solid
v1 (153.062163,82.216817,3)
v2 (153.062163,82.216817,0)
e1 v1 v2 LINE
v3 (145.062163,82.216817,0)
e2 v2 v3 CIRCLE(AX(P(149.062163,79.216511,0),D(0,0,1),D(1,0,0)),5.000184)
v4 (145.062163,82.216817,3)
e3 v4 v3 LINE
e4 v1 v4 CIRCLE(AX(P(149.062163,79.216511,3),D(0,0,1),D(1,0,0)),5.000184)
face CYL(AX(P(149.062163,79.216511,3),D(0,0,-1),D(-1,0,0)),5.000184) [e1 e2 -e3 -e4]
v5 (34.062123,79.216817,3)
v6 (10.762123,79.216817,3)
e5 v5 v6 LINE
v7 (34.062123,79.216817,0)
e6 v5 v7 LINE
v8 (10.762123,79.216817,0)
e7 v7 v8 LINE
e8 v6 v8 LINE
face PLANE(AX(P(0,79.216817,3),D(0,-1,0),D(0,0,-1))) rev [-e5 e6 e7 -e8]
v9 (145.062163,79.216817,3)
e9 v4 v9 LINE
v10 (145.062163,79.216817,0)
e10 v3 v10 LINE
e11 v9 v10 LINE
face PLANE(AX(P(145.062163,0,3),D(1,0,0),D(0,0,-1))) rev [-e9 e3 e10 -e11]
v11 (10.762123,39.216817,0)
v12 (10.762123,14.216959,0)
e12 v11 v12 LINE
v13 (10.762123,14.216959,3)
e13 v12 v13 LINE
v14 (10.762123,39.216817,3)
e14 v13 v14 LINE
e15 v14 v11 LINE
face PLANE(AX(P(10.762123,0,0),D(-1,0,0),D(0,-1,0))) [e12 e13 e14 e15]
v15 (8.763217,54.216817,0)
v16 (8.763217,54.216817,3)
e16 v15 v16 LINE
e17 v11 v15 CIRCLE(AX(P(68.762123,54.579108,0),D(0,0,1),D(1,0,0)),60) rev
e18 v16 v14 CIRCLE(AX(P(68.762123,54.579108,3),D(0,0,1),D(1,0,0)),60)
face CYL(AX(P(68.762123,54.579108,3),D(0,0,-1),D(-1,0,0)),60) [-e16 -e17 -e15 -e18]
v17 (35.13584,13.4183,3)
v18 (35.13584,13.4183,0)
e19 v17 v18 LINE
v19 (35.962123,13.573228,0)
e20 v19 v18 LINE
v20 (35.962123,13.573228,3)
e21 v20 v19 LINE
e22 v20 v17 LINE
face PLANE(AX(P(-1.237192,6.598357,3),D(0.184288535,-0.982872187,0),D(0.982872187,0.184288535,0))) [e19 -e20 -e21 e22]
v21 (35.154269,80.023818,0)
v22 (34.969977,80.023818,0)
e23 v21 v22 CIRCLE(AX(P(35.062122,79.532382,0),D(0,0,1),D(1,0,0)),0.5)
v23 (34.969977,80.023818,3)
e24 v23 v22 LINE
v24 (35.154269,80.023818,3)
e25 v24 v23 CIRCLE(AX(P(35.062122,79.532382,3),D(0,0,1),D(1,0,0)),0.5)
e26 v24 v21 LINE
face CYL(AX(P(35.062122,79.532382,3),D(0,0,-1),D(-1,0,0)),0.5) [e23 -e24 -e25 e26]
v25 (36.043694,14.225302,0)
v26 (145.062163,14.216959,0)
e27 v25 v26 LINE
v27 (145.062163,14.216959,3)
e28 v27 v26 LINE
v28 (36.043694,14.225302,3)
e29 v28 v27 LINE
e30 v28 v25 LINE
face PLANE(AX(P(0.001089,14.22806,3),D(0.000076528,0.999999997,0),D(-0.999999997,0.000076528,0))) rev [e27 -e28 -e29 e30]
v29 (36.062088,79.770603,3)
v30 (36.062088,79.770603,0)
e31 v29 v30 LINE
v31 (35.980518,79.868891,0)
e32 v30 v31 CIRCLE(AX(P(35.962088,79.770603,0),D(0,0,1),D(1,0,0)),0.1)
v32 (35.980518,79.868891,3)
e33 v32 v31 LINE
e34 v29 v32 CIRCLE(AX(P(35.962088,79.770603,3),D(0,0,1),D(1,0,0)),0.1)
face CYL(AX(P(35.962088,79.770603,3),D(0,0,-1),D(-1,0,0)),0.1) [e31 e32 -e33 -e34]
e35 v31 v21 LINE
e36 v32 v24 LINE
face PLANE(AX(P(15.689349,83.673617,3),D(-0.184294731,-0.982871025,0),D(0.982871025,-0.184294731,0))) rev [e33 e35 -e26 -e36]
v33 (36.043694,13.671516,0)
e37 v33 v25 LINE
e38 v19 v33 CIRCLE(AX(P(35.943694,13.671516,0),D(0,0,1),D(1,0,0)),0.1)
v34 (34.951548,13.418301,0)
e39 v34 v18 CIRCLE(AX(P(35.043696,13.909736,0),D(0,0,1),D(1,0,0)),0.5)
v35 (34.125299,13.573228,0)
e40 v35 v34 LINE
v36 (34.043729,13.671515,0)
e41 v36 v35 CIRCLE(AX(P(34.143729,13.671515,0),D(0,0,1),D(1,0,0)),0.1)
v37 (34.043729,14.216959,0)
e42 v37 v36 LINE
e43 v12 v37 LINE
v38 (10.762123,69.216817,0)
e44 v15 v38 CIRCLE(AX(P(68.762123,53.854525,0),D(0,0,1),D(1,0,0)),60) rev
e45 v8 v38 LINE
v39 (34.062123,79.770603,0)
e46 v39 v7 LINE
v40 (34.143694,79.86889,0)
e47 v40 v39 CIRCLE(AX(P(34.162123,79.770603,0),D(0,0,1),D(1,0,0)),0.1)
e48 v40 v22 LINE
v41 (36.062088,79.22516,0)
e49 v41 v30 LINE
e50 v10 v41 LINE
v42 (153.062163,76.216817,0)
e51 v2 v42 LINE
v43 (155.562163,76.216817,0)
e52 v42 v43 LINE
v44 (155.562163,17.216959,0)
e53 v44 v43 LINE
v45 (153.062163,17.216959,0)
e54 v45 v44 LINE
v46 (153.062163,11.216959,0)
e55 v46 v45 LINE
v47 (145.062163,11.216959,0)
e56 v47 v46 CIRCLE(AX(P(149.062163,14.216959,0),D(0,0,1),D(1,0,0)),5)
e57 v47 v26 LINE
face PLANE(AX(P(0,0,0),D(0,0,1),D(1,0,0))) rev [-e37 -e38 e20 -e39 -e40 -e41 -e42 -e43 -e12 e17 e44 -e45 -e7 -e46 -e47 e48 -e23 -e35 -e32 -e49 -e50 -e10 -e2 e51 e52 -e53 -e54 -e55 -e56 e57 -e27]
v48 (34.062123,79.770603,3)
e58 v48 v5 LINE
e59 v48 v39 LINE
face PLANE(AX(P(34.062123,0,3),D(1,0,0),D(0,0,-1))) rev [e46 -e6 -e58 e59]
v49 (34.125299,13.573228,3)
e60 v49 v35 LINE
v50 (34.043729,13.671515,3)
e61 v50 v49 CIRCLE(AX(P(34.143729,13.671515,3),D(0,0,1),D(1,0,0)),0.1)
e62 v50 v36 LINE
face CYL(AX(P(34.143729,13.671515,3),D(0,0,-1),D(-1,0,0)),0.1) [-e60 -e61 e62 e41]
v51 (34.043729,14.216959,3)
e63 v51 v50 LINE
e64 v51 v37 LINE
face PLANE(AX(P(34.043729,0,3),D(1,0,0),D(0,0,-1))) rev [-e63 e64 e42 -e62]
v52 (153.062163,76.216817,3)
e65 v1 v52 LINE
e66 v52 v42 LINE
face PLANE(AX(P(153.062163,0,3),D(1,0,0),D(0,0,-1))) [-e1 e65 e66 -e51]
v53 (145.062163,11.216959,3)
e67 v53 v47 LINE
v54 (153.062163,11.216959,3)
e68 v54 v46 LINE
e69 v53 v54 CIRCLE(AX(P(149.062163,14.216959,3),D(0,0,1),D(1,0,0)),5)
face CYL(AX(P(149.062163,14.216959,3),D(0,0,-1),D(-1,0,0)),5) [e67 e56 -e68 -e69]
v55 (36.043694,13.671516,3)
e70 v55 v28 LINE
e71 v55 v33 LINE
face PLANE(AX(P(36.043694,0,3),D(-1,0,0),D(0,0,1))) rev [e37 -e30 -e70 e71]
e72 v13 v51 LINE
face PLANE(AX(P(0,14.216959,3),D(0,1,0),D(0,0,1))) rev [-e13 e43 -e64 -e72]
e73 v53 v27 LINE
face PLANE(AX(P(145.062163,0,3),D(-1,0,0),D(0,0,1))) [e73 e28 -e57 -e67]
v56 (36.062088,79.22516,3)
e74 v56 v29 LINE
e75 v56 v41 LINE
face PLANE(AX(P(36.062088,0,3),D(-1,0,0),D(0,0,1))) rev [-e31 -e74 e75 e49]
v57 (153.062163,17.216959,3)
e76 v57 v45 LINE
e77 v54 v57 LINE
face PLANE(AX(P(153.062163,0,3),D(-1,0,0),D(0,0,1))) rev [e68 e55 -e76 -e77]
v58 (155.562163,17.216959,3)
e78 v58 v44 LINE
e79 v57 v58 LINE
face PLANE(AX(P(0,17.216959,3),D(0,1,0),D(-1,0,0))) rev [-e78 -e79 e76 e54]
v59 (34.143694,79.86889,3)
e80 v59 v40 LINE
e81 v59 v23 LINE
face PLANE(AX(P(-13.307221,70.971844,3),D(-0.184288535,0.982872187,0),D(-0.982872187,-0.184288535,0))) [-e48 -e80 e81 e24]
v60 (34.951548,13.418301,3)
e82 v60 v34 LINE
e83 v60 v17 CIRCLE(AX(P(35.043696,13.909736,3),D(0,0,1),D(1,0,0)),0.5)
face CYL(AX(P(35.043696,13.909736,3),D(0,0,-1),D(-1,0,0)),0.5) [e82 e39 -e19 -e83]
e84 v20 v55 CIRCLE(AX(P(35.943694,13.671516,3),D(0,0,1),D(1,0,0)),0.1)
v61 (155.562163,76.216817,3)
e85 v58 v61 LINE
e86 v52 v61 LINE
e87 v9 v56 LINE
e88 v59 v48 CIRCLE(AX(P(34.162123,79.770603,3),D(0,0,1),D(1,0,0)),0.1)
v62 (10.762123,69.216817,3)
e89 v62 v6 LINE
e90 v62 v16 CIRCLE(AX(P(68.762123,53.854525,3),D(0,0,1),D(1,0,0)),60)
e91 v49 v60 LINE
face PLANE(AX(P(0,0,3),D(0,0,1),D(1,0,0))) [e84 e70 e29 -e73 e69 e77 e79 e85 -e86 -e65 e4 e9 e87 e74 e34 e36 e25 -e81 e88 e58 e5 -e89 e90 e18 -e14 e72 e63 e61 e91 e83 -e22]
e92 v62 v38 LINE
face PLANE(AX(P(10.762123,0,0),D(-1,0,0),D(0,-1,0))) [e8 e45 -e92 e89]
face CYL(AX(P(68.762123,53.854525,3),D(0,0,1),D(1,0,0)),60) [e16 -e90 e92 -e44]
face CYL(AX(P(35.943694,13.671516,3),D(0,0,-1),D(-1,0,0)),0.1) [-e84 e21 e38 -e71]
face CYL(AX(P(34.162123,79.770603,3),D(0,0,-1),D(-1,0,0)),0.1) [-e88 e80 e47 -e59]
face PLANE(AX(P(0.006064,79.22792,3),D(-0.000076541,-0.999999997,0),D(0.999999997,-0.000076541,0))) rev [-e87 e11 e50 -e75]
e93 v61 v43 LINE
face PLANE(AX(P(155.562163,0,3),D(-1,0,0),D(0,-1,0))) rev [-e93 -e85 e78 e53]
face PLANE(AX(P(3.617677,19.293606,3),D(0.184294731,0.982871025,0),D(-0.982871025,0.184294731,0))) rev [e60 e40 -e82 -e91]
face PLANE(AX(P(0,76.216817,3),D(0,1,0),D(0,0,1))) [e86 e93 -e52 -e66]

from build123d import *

# Parameters (mm, degrees)
SALIENTE_EXTRUIR1_DEPTH = 3
CROQUIS8_W              = 3
CROQUIS8_H              = 64.999858303
CORTAR_EXTRUIR2_DEPTH   = 0.7
CROQUIS10_W             = 2
CROQUIS10_H             = 30
SALIENTE_EXTRUIR3_DEPTH = 3
REDONDEO2_R             = 60


with BuildPart() as part:
    # Croquis1 → Saliente-Extruir1 (new body)
    with BuildSketch(Plane.XY):
        with BuildLine():
            Line((153.062162769, 17.216958542), (155.56216277, 17.216958542))
            Line((155.56216277, 17.216958542), (155.56216277, 76.216816844))
            Line((155.56216277, 76.216816844), (153.062162769, 76.216816844))
            Line((153.062162769, 76.216816844), (153.062162769, 82.216816846))
            ThreePointArc((153.062162769, 82.216816846), (149.062162768, 84.216694386), (145.062162767, 82.216816846))
            Line((145.062162767, 82.216816846), (145.062162767, 79.216816845))
            Line((145.062162767, 79.216816845), (36.062088373, 79.225159863))
            Line((36.062088373, 79.225159863), (36.062088373, 79.770603401))
            ThreePointArc((36.062088373, 79.770603401), (36.039039485, 79.834466742), (35.980517846, 79.868890504))
            Line((35.980517846, 79.868890504), (35.154268939, 80.023817566))
            ThreePointArc((35.154268939, 80.023817566), (35.062123149, 80.032382053), (34.969977306, 80.023818147))
            Line((34.969977306, 80.023818147), (34.143694323, 79.868890087))
            ThreePointArc((34.143694323, 79.868890087), (34.085172266, 79.834466452), (34.062123176, 79.770602869))
            Line((34.062123176, 79.770602869), (34.062123176, 79.216816845))
            Line((34.062123176, 79.216816845), (10.06212317, 79.216816845))
            Line((10.06212317, 79.216816845), (10.06212317, 14.216958542))
            Line((10.06212317, 14.216958542), (34.043728806, 14.216958542))
            Line((34.043728806, 14.216958542), (34.043728806, 13.671515004))
            ThreePointArc((34.043728806, 13.671515004), (34.066777694, 13.607651663), (34.125299333, 13.573227901))
            Line((34.125299333, 13.573227901), (34.95154824, 13.418300839))
            ThreePointArc((34.95154824, 13.418300839), (35.04369403, 13.409736352), (35.135839873, 13.418300258))
            Line((35.135839873, 13.418300258), (35.962122856, 13.573228317))
            ThreePointArc((35.962122856, 13.573228317), (36.020644913, 13.607651952), (36.043694003, 13.671515536))
            Line((36.043694003, 13.671515536), (36.043694003, 14.22530156))
            Line((36.043694003, 14.22530156), (145.062162767, 14.216958542))
            Line((145.062162767, 14.216958542), (145.062162767, 11.216958541))
            ThreePointArc((145.062162767, 11.216958541), (149.062162768, 9.21695854), (153.062162769, 11.216958541))
            Line((153.062162769, 11.216958541), (153.062162769, 17.216958542))
        make_face()
    extrude(amount=SALIENTE_EXTRUIR1_DEPTH)

    # Croquis8 → Cortar-Extruir2 (cut)
    with BuildSketch(Plane.ZY.offset(-10.06212317)):
        with Locations((1.5, 46.716887694)):
            Rectangle(CROQUIS8_W, CROQUIS8_H)
    extrude(amount=-CORTAR_EXTRUIR2_DEPTH, mode=Mode.SUBTRACT)

    # Croquis10 → Saliente-Extruir3 (add)
    with BuildSketch(Plane(origin=(0, 0, 0), x_dir=(-1, 0, 0), z_dir=(0, 0, -1))):
        with Locations((-9.76212317, 54.216816845)):
            Rectangle(CROQUIS10_W, CROQUIS10_H)
    extrude(amount=-SALIENTE_EXTRUIR3_DEPTH)

    # Redondeo2
    # the kernel refuses this fillet: 60 mm, written as the material it takes off along each edge
    with BuildSketch(Plane(origin=(8.76212317, 69.216816845, -38.405728739), x_dir=(1, 0, 0), z_dir=(0, 0, 1))) as redondeo2_piece_1:
        with BuildLine():
            CenterArc((60, -15.362291496), REDONDEO2_R, 165.164888418, 14.835111582)
            Line((0, -15.362291496), (0, 0))
            Line((0, 0), (2, 0))
        make_face()
    extrude(amount=79.811457479, mode=Mode.SUBTRACT)
    with BuildSketch(Plane(origin=(8.76212317, 39.216816845, -38.405728739), x_dir=(0, 1, 0), z_dir=(0, 0, 1))) as redondeo2_piece_2:
        with BuildLine():
            CenterArc((15.362291496, -60), REDONDEO2_R, 90, 14.835111582)
            Line((0, -2), (0, 0))
            Line((0, 0), (15.362291496, 0))
        make_face()
    extrude(amount=79.811457479, mode=Mode.SUBTRACT)


solid = part.part
